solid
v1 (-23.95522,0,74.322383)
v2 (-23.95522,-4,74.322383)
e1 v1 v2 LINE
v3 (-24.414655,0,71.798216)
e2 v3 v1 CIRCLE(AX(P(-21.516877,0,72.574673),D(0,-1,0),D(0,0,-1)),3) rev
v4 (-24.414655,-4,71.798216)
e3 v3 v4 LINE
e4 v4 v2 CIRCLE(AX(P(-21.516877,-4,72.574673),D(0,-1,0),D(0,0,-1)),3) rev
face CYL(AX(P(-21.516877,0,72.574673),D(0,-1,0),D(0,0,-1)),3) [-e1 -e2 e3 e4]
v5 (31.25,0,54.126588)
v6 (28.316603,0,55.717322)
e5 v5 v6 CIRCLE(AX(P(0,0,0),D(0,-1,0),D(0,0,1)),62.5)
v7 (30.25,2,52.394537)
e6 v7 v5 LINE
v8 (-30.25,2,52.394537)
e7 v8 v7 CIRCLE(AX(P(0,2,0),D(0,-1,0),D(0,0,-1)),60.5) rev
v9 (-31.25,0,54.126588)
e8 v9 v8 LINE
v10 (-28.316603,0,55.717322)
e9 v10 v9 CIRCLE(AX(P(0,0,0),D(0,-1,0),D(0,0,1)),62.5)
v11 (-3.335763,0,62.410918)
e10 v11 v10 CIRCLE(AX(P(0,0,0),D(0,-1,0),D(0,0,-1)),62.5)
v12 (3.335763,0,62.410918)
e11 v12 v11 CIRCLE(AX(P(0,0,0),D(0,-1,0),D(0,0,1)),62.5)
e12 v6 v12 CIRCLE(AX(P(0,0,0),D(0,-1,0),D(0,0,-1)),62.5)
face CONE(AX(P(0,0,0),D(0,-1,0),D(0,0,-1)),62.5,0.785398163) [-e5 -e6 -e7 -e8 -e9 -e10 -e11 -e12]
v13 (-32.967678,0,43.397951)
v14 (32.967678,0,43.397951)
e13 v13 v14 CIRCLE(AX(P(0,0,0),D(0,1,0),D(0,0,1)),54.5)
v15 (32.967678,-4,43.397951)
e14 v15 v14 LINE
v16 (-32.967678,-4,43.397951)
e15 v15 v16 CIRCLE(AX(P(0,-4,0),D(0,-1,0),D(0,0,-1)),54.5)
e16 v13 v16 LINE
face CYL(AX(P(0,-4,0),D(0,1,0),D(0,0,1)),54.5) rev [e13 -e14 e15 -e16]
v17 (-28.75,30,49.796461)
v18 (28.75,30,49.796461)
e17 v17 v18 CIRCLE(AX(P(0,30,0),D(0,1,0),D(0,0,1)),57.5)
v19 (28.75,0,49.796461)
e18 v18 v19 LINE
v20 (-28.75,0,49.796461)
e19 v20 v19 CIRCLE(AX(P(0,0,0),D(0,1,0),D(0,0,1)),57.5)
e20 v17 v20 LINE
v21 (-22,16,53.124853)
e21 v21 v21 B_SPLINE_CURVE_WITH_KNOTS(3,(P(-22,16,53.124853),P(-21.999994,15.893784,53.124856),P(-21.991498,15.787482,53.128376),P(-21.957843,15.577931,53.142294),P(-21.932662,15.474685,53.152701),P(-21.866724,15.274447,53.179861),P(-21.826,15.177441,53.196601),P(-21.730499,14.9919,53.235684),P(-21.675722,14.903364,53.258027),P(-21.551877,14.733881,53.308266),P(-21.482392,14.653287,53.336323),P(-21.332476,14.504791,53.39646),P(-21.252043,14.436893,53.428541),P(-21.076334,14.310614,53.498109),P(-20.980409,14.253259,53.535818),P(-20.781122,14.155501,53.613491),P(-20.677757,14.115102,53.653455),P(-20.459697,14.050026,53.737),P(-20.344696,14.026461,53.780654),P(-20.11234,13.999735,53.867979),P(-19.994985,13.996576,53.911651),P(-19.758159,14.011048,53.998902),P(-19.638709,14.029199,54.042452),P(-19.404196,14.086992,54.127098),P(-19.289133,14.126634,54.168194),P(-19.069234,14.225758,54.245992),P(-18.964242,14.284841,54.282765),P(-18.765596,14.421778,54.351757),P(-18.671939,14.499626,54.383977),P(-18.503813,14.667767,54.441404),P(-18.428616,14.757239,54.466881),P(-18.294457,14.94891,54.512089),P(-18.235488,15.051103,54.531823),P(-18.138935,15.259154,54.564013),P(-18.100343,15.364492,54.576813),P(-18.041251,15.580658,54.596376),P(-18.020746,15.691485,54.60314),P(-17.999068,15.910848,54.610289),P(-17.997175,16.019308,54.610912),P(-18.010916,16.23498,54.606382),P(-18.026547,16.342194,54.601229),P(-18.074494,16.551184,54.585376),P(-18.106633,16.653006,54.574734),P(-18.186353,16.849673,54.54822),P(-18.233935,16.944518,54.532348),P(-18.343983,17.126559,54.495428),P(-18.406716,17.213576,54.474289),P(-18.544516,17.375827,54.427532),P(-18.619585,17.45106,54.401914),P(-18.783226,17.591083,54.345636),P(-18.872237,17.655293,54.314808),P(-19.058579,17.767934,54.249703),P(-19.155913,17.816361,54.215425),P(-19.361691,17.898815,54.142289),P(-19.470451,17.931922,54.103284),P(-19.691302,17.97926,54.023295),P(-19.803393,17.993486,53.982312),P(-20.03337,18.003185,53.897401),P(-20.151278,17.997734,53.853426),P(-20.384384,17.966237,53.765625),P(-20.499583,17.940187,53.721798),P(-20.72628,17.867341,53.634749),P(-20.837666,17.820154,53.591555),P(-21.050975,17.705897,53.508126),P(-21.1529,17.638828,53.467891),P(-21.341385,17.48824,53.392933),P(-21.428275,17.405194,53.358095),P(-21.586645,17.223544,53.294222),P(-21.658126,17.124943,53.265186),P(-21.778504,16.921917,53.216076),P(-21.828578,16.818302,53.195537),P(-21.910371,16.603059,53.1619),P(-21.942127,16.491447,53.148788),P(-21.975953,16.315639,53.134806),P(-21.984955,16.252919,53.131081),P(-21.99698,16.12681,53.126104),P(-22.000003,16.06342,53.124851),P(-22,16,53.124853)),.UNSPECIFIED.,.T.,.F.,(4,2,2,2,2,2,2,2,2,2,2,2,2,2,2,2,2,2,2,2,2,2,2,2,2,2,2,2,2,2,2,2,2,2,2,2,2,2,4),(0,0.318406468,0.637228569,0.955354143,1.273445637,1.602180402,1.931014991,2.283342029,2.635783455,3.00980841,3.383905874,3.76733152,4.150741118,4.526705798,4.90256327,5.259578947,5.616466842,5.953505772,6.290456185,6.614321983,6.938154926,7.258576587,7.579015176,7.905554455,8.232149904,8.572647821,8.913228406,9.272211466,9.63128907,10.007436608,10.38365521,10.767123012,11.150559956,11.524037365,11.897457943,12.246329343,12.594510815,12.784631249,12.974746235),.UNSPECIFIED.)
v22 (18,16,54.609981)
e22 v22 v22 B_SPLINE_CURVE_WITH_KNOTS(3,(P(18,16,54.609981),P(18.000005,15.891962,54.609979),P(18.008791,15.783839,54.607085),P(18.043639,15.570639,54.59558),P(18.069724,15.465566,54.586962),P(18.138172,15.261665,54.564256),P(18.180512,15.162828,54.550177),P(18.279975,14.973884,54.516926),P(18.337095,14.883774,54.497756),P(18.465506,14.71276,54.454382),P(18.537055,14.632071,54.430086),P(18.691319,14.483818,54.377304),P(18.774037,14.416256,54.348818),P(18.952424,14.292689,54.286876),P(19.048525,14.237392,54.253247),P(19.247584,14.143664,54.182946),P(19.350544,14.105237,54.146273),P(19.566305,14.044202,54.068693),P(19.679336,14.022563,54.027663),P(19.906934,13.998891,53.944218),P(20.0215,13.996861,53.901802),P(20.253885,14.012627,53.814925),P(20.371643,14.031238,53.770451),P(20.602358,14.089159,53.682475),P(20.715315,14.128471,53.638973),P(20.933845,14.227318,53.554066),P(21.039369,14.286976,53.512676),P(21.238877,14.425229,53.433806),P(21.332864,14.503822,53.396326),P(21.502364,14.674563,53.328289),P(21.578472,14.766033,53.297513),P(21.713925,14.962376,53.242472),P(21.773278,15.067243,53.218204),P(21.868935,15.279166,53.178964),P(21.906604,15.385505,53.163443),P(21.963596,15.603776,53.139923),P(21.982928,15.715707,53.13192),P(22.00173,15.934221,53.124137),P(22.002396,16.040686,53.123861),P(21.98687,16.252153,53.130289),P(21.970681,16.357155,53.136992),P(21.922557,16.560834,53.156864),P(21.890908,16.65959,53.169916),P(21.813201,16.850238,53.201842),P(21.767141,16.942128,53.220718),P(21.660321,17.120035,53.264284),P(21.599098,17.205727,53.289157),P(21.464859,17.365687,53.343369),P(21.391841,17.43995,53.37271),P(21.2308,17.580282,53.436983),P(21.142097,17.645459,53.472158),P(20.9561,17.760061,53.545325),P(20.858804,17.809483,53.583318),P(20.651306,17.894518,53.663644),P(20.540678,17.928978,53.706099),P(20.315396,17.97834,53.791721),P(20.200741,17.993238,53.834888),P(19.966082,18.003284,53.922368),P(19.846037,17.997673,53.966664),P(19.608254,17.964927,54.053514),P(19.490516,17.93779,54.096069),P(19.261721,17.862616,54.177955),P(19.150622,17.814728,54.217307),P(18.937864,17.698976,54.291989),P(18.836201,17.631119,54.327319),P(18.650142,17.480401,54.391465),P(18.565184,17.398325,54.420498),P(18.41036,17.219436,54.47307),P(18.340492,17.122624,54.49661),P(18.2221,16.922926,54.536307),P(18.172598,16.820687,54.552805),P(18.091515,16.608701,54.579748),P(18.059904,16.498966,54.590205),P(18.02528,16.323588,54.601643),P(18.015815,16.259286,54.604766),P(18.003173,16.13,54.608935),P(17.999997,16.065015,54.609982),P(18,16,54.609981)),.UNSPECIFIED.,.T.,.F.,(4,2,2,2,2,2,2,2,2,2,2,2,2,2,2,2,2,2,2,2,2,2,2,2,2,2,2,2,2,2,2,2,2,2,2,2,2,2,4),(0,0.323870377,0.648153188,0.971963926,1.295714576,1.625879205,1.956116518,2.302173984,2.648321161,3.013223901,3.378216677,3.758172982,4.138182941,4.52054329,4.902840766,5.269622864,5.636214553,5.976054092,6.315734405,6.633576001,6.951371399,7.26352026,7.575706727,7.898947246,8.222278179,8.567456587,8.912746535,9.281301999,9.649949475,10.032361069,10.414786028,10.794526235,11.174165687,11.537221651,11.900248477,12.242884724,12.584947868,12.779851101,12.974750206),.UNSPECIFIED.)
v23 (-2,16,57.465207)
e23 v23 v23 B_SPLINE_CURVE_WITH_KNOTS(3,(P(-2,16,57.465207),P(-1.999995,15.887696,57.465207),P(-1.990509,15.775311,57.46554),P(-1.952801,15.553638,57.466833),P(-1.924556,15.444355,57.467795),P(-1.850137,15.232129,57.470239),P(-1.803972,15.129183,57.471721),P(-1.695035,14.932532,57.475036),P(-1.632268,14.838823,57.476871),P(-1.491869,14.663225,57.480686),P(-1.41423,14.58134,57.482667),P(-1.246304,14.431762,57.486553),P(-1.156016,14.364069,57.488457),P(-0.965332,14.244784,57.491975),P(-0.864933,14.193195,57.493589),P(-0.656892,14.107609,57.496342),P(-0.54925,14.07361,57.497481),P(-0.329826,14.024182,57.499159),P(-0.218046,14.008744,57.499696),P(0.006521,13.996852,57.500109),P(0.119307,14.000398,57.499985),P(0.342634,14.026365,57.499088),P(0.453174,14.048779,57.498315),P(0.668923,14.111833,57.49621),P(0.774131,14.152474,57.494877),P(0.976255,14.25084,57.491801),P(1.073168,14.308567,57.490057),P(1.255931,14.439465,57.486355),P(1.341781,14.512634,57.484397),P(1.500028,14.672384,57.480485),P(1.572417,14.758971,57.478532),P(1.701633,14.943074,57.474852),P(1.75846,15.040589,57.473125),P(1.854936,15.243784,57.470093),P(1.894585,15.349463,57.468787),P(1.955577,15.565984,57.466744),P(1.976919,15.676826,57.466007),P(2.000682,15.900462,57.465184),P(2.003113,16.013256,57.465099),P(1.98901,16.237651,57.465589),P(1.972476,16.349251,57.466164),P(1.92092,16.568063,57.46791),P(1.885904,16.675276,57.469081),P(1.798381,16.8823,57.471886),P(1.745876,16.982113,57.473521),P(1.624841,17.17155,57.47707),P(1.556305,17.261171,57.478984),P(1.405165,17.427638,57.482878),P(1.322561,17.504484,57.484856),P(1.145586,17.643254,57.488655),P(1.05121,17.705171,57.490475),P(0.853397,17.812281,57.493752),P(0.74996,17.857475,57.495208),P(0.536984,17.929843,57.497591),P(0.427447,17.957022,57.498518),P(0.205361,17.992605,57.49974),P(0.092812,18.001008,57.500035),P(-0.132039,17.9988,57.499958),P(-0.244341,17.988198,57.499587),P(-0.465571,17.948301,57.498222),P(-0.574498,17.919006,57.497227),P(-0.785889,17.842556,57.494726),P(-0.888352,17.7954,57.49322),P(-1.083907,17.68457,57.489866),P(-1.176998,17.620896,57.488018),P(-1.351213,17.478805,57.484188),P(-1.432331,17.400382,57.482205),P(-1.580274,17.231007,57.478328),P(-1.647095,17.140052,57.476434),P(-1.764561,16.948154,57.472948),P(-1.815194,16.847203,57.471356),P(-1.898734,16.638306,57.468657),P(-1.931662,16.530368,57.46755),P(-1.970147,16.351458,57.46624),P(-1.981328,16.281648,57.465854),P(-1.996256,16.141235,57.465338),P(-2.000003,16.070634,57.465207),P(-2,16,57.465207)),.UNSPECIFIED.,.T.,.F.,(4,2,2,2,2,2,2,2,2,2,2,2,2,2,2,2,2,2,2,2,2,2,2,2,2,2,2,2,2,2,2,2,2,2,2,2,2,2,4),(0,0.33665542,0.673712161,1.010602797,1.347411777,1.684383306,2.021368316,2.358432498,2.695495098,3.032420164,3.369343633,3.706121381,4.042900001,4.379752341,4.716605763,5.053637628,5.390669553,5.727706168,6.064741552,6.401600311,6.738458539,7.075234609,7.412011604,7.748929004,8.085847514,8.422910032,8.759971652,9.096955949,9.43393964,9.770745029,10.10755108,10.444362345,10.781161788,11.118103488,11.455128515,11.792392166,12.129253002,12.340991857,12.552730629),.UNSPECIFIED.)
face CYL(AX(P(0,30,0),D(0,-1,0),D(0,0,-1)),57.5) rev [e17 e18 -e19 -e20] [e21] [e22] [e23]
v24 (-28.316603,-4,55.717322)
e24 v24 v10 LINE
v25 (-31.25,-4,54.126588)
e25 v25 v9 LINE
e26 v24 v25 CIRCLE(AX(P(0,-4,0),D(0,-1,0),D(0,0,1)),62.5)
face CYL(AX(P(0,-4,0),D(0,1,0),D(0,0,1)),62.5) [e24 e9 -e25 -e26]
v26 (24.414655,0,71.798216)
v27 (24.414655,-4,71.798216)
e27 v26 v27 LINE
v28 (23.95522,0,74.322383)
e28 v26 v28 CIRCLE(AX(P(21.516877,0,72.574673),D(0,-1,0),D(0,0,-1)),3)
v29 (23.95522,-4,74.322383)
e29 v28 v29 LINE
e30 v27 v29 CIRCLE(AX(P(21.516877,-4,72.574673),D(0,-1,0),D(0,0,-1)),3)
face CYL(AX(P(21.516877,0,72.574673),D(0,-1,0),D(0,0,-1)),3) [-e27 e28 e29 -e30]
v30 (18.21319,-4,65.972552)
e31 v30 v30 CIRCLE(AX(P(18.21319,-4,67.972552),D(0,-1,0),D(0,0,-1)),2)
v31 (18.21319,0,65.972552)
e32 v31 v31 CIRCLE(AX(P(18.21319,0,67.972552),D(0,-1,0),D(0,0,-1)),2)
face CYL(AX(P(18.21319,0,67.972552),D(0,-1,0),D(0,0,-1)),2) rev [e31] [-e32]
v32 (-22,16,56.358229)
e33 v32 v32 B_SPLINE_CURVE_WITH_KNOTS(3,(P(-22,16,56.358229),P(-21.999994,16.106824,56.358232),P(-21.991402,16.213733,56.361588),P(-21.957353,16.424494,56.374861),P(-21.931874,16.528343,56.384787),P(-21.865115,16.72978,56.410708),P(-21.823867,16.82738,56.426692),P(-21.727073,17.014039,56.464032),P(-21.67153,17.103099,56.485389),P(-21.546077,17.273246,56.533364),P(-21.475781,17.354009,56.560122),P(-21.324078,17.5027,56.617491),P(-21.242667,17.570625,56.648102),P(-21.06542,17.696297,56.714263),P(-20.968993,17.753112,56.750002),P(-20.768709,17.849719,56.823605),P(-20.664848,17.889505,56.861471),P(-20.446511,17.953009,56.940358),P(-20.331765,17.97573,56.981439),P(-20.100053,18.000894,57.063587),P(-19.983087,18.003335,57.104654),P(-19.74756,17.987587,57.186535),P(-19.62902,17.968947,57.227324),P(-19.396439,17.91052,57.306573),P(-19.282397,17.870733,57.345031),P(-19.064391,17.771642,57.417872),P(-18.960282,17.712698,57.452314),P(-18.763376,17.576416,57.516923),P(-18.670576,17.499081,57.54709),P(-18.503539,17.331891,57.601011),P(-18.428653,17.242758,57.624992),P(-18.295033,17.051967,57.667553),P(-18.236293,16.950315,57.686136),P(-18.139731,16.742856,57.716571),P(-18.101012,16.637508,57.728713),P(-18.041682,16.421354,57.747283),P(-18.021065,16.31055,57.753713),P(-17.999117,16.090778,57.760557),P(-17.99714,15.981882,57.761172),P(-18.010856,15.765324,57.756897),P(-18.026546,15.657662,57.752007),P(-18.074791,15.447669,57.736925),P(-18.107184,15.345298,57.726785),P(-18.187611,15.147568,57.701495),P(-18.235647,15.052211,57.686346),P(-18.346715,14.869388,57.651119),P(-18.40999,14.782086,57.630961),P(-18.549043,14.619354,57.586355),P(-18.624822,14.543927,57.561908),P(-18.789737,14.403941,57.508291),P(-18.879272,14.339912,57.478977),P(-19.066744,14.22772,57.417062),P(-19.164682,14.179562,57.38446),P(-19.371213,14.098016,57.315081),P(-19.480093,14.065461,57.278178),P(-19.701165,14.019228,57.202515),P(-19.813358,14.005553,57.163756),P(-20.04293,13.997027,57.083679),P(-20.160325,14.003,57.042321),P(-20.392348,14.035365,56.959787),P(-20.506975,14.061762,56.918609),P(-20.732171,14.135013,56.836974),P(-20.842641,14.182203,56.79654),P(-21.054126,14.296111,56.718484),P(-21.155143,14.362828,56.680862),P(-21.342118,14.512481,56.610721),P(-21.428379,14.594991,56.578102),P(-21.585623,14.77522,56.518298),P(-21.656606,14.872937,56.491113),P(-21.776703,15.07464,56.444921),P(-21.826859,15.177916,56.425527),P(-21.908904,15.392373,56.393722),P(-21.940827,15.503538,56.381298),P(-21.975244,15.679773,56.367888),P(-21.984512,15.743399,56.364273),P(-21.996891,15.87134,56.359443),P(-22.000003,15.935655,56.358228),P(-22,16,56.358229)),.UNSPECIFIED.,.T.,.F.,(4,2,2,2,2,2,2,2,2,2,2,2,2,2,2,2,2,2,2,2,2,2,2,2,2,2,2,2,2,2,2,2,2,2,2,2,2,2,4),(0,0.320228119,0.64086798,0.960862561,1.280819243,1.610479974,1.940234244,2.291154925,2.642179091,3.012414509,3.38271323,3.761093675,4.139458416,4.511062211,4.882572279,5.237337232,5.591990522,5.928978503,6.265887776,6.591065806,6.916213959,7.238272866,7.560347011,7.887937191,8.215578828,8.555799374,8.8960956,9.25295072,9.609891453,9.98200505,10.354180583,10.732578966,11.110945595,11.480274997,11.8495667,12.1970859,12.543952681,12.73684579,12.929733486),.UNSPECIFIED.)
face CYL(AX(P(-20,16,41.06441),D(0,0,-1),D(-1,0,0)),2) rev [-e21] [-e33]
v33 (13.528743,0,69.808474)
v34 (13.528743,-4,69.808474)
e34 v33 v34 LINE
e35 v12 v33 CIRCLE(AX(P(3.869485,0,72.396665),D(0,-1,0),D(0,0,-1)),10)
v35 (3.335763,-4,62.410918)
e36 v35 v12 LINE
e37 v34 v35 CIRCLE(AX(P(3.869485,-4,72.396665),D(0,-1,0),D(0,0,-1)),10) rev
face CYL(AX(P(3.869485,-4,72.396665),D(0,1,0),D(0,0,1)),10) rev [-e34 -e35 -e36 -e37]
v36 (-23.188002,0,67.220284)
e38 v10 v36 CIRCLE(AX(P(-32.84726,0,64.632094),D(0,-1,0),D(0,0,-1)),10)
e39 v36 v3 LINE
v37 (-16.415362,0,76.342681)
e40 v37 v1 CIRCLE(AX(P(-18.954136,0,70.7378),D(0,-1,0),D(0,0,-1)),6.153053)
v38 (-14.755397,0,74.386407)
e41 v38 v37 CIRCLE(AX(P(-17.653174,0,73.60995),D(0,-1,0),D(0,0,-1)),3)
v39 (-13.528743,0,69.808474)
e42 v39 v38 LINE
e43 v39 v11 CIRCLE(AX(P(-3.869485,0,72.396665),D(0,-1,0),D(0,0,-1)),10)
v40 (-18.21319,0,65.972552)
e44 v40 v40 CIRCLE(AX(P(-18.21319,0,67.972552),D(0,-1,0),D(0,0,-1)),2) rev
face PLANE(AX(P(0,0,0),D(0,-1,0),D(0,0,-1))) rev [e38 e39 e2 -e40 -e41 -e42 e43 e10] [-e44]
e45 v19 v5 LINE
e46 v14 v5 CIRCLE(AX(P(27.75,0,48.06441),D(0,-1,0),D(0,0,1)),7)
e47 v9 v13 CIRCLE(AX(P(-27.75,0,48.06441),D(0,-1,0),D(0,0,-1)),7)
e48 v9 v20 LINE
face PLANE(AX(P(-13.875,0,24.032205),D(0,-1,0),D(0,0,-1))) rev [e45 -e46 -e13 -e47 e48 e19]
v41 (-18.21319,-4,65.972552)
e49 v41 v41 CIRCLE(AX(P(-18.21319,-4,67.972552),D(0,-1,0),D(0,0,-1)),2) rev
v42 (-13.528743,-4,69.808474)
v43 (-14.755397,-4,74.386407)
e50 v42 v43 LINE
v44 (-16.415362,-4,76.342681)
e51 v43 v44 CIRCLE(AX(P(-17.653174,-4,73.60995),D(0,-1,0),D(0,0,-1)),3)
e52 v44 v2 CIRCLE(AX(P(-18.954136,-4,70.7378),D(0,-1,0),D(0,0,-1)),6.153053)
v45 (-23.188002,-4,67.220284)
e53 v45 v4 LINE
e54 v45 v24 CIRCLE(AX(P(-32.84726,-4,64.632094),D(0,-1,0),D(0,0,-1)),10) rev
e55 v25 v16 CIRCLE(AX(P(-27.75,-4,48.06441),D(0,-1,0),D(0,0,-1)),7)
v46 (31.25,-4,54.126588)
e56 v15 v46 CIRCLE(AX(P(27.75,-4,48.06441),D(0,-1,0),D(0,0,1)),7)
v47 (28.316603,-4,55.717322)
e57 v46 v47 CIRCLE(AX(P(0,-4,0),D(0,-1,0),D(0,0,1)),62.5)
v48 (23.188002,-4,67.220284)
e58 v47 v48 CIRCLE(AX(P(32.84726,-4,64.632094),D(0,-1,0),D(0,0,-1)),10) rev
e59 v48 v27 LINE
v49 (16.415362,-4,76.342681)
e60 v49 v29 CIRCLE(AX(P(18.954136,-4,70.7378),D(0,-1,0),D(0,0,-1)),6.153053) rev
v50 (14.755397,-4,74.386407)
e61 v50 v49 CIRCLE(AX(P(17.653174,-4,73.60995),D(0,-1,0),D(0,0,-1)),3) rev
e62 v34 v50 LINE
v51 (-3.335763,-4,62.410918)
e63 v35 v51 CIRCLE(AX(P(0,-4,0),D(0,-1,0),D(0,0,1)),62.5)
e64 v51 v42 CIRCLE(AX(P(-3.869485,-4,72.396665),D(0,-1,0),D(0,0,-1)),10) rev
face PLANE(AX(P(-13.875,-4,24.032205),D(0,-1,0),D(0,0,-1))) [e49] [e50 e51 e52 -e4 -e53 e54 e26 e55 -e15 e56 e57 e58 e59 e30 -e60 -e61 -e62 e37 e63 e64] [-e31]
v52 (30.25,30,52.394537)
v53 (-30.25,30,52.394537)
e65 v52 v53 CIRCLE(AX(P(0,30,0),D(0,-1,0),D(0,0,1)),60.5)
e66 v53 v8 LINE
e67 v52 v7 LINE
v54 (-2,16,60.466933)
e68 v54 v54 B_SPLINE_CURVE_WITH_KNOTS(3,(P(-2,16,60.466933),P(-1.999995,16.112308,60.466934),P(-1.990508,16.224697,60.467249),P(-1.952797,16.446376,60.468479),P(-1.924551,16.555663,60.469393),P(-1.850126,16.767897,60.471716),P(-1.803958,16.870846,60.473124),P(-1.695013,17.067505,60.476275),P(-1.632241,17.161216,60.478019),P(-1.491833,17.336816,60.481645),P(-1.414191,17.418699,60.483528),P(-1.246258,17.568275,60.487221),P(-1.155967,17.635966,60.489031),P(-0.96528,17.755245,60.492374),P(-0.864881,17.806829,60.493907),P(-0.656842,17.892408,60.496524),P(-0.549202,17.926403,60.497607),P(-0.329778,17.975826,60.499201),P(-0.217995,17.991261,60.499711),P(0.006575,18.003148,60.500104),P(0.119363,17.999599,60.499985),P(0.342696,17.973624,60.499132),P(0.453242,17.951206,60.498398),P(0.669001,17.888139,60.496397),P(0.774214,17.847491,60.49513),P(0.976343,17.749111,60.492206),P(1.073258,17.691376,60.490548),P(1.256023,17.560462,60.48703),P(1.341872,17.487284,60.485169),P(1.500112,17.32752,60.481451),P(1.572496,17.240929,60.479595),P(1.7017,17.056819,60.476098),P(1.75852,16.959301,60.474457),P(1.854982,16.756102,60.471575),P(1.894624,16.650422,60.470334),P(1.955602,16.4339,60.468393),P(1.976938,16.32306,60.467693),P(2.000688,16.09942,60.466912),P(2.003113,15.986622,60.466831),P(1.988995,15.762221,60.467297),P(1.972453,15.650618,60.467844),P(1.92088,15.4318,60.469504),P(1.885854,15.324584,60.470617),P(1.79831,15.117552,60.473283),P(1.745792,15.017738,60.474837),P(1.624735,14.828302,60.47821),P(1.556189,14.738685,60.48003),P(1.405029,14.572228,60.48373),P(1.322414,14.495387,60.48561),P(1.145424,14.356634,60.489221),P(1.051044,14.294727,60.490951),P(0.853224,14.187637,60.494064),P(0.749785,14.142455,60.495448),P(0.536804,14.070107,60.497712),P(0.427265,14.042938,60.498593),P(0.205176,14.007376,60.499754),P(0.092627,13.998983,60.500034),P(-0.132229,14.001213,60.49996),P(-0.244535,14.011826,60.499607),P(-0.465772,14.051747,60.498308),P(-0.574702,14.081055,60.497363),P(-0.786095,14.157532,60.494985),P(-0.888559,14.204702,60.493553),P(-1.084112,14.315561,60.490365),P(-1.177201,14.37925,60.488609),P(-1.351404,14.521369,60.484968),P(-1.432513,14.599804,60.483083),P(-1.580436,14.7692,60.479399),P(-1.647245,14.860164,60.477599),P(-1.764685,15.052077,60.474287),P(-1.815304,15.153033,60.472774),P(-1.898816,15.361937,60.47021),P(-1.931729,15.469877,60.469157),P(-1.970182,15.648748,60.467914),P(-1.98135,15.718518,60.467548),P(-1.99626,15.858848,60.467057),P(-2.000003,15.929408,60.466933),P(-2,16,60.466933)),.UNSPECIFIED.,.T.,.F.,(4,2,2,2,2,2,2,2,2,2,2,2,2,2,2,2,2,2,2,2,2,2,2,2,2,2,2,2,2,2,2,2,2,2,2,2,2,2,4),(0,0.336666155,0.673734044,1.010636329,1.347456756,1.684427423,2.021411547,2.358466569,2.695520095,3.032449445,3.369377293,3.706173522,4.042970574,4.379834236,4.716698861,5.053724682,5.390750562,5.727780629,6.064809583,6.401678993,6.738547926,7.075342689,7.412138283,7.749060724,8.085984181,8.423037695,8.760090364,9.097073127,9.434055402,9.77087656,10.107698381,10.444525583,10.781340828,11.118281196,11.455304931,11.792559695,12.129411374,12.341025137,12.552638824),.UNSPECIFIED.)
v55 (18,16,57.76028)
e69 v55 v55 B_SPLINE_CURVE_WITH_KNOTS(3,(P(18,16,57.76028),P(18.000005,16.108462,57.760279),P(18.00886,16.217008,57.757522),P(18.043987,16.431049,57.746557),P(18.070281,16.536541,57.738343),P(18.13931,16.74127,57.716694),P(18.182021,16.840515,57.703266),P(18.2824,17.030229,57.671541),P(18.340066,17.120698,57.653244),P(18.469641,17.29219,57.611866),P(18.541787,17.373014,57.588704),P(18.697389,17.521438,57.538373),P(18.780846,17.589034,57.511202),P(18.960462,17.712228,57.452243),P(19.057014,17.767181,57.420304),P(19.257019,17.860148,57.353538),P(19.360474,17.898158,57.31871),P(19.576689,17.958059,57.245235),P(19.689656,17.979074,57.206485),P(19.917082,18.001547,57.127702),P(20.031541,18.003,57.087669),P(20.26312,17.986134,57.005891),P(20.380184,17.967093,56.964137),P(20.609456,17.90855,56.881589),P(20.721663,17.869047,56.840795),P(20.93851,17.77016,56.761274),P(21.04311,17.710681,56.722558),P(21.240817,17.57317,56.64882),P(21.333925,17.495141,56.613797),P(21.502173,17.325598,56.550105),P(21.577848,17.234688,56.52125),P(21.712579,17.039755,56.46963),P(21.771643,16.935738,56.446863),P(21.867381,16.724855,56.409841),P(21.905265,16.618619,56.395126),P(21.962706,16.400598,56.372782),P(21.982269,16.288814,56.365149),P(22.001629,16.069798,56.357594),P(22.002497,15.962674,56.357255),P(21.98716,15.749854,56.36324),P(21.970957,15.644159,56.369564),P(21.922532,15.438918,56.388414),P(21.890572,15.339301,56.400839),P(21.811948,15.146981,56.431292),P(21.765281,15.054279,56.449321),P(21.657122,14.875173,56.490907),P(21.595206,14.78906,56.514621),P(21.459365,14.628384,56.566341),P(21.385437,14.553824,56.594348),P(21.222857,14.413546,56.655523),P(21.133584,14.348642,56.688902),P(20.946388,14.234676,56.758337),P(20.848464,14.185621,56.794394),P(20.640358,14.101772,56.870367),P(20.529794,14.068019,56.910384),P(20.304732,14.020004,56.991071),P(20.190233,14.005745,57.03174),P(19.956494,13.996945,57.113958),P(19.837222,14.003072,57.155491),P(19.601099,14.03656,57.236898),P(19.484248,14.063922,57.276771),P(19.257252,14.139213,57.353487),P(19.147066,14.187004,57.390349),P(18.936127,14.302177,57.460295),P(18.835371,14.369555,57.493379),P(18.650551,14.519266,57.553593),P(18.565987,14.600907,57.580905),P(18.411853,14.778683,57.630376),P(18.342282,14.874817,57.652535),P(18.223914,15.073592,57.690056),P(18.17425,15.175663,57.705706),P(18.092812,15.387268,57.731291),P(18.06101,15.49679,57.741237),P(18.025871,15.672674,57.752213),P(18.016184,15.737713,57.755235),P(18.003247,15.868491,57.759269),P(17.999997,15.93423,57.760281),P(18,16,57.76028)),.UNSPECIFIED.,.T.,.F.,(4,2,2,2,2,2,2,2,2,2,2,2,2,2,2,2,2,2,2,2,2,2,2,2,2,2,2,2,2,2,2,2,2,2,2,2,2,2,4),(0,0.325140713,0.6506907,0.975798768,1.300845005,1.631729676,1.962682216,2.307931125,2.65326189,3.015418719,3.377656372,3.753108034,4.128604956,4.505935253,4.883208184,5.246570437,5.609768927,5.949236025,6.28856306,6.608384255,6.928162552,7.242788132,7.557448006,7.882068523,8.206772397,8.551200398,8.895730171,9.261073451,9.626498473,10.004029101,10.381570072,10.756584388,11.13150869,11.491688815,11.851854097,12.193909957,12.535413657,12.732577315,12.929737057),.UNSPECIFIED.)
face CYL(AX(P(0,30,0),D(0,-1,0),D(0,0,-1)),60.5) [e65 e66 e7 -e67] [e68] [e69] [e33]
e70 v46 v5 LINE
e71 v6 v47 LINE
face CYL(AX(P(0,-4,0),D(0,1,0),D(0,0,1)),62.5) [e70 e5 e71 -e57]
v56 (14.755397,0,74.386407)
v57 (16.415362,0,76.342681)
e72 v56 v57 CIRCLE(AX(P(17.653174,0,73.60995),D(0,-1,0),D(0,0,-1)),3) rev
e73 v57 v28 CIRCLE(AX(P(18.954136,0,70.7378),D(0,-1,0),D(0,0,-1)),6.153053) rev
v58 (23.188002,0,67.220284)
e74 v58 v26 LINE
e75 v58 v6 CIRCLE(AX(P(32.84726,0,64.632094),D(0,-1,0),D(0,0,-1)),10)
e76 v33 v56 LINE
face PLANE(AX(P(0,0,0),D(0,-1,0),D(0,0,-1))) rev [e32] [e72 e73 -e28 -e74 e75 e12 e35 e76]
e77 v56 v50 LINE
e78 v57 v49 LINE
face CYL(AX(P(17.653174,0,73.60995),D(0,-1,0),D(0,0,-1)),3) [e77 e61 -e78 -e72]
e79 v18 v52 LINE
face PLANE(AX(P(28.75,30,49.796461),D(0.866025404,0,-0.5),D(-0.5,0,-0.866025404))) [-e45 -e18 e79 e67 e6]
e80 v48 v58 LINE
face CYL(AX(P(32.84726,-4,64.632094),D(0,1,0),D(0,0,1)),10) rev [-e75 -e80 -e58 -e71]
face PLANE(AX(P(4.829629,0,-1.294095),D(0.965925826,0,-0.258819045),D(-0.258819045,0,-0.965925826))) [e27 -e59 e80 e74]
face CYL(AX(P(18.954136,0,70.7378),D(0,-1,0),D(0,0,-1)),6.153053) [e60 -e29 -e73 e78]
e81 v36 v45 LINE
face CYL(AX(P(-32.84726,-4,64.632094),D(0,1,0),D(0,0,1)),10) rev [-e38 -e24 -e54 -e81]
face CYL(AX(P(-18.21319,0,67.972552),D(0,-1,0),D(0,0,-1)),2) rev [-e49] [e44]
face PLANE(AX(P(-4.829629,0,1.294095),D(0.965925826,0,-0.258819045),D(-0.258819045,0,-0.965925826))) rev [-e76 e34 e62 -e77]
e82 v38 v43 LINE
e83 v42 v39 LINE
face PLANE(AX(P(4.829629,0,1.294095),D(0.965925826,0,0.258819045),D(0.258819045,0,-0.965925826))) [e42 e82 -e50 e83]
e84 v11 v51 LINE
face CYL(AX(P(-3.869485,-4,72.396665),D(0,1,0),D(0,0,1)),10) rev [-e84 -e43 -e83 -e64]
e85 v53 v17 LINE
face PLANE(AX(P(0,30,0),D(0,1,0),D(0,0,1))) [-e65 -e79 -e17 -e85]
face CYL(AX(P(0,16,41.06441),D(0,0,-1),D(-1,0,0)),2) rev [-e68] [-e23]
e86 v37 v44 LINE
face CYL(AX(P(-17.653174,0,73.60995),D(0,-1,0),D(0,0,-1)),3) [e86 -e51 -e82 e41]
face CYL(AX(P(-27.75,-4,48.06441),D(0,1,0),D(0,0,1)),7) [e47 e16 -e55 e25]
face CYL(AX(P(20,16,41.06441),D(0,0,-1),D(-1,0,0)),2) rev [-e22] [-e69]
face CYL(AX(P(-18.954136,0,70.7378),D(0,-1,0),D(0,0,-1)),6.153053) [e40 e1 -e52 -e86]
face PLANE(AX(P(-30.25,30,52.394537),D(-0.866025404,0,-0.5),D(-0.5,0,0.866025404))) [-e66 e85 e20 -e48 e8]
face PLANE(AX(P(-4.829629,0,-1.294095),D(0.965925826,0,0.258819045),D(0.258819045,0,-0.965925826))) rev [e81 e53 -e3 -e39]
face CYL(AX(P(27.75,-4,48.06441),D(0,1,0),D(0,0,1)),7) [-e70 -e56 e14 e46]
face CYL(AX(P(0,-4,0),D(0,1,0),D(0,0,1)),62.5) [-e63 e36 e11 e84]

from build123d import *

# Parameters (mm, degrees)
BOSS_EXTRUDE1_DEPTH     = 10
BOSS_EXTRUDE2_DEPTH     = 30
BOSS_EXTRUDE3_DEPTH     = 4
CHAMFER1_SIZE           = 2
CUT_EXTRUDE1_DEPTH      = 78.548774974
CUT_EXTRUDE1_DEPTH_BACK = 78.548774974
SKETCH5_R               = 2
BOSS_EXTRUDE4_START     = -4
SKETCH6_R               = 2
BOSS_EXTRUDE4_DEPTH     = 4
FILLET1_R               = 10
CUT_EXTRUDE2_DEPTH      = 90.553145411
CUT_EXTRUDE2_DEPTH_BACK = 90.553145411
SKETCH7_R               = 54.5


with BuildPart() as part:
    # Sketch1 → Boss-Extrude1 (new body)
    with BuildSketch(Plane(origin=(0, 0, 0), x_dir=(1, 0, 0), z_dir=(0, 1, 0))):
        with BuildLine():
            ThreePointArc((-25.25, -43.734282891), (0, -50.5), (25.25, -43.734282891))
            Line((25.25, -43.734282891), (27.25, -47.198384506))
            ThreePointArc((27.25, -47.198384506), (0, -54.5), (-27.25, -47.198384506))
            Line((-27.25, -47.198384506), (-25.25, -43.734282891))
        make_face()
    extrude(amount=BOSS_EXTRUDE1_DEPTH)



with BuildPart() as body_2:
    # Sketch3 → Boss-Extrude2 (new body)
    with BuildSketch(Plane.XZ):
        with BuildLine():
            Line((-30.25, 52.394536929), (-28.75, 49.796460718))
            ThreePointArc((-28.75, 49.796460718), (0, 57.5), (28.75, 49.796460718))
            Line((28.75, 49.796460718), (30.25, 52.394536929))
            ThreePointArc((30.25, 52.394536929), (0, 60.5), (-30.25, 52.394536929))
        make_face()
    extrude(amount=-BOSS_EXTRUDE2_DEPTH)


with BuildPart() as part_1:
    add(part.part)

    add(body_2.part)  # Boss-Extrude3 merges body 2
    # Sketch4 → Boss-Extrude3 (add)
    with BuildSketch(Plane.XZ):
        with BuildLine():
            ThreePointArc((-24.25, 42.002232084), (0, 48.5), (24.25, 42.002232084))
            ThreePointArc((24.25, 42.002232084), (33.812177826, 44.56440991), (31.25, 54.126587737))
            ThreePointArc((31.25, 54.126587737), (0, 62.5), (-31.25, 54.126587737))
            ThreePointArc((-31.25, 54.126587737), (-33.812177826, 44.56440991), (-24.25, 42.002232084))
        make_face()
    extrude(amount=BOSS_EXTRUDE3_DEPTH)

    # Chamfer1
    chamfer1_edges = [part_1.edges().sort_by_distance(p)[0] for p in [
        (0, 0, 60.5),
        (0, 0, 50.5),
    ]]
    chamfer(chamfer1_edges, length=CHAMFER1_SIZE - 0.0001)  # a hair under: the kernel refuses the full size

    # Sketch5 → Cut-Extrude1 (cut, two sides: drawn at the far end of the back side and taken through both)
    with BuildSketch(Plane.XY.offset(-CUT_EXTRUDE1_DEPTH_BACK)):
        with Locations(Location((0, 16, 0), (0, 0, 180))):
            Circle(SKETCH5_R)
        with Locations(Location((-20, 16, 0), (0, 0, 180))):
            Circle(SKETCH5_R)
        with Locations(Location((20, 16, 0), (0, 0, 180))):
            Circle(SKETCH5_R)
    extrude(amount=CUT_EXTRUDE1_DEPTH + CUT_EXTRUDE1_DEPTH_BACK, mode=Mode.SUBTRACT)

    # Sketch6 → Boss-Extrude4 (add)
    # profile 1 of 2: a face of its own
    with BuildSketch(Plane.XZ.offset(4).offset(BOSS_EXTRUDE4_START)):
        with BuildLine():
            Line((20.953972553, 58.882773663), (24.414654978, 71.798216302))
            ThreePointArc((24.414654978, 71.798216302), (24.468385119, 73.111891055), (23.955219754, 74.322382523))
            ThreePointArc((23.955219754, 74.322382523), (20.546663808, 76.681193258), (16.415362401, 76.342681212))
            ThreePointArc((16.415362401, 76.342681212), (15.365702425, 75.550947532), (14.755396715, 74.386406753))
            Line((14.755396715, 74.386406753), (11.29471429, 61.470964114))
            ThreePointArc((11.29471429, 61.470964114), (16.176190319, 60.370364143), (20.953972553, 58.882773663))
        make_face()
        with Locations(Location((18.213190451, 67.972552131, 0), (0, 0, 270))):
            Circle(SKETCH6_R, mode=Mode.SUBTRACT)
    # profile 2 of 2: a face of its own
    with BuildSketch(Plane.XZ.offset(4).offset(BOSS_EXTRUDE4_START)):
        with BuildLine():
            Line((-20.953972553, 58.882773663), (-24.414654978, 71.798216302))
            ThreePointArc((-24.414654978, 71.798216302), (-24.468385119, 73.111891055), (-23.955219754, 74.322382523))
            ThreePointArc((-23.955219754, 74.322382523), (-20.546663808, 76.681193258), (-16.415362401, 76.342681212))
            ThreePointArc((-16.415362401, 76.342681212), (-15.365702425, 75.550947532), (-14.755396715, 74.386406753))
            Line((-14.755396715, 74.386406753), (-11.29471429, 61.470964114))
            ThreePointArc((-11.29471429, 61.470964114), (-16.176190319, 60.370364143), (-20.953972553, 58.882773663))
        make_face()
        with Locations(Location((-18.213190451, 67.972552131, 0), (0, 0, 270))):
            Circle(SKETCH6_R, mode=Mode.SUBTRACT)
    extrude(amount=BOSS_EXTRUDE4_DEPTH)

    # Fillet1
    fillet1_edges = [part_1.edges().sort_by_distance(p)[0] for p in [
        (-11.29471429, -2, 61.470964114),
        (-20.953972553, -2, 58.882773663),
        (20.953972553, -2, 58.882773663),
        (11.29471429, -2, 61.470964114),
    ]]
    fillet(fillet1_edges, radius=FILLET1_R)

    # Sketch7 → Cut-Extrude2 (cut, two sides: drawn at the far end of the back side and taken through both)
    with BuildSketch(Plane(origin=(0, 0, 0), x_dir=(1, 0, 0), z_dir=(0, 1, 0)).offset(-CUT_EXTRUDE2_DEPTH_BACK)):
        Circle(SKETCH7_R)
    extrude(amount=CUT_EXTRUDE2_DEPTH + CUT_EXTRUDE2_DEPTH_BACK, mode=Mode.SUBTRACT)


solid = part_1.part
